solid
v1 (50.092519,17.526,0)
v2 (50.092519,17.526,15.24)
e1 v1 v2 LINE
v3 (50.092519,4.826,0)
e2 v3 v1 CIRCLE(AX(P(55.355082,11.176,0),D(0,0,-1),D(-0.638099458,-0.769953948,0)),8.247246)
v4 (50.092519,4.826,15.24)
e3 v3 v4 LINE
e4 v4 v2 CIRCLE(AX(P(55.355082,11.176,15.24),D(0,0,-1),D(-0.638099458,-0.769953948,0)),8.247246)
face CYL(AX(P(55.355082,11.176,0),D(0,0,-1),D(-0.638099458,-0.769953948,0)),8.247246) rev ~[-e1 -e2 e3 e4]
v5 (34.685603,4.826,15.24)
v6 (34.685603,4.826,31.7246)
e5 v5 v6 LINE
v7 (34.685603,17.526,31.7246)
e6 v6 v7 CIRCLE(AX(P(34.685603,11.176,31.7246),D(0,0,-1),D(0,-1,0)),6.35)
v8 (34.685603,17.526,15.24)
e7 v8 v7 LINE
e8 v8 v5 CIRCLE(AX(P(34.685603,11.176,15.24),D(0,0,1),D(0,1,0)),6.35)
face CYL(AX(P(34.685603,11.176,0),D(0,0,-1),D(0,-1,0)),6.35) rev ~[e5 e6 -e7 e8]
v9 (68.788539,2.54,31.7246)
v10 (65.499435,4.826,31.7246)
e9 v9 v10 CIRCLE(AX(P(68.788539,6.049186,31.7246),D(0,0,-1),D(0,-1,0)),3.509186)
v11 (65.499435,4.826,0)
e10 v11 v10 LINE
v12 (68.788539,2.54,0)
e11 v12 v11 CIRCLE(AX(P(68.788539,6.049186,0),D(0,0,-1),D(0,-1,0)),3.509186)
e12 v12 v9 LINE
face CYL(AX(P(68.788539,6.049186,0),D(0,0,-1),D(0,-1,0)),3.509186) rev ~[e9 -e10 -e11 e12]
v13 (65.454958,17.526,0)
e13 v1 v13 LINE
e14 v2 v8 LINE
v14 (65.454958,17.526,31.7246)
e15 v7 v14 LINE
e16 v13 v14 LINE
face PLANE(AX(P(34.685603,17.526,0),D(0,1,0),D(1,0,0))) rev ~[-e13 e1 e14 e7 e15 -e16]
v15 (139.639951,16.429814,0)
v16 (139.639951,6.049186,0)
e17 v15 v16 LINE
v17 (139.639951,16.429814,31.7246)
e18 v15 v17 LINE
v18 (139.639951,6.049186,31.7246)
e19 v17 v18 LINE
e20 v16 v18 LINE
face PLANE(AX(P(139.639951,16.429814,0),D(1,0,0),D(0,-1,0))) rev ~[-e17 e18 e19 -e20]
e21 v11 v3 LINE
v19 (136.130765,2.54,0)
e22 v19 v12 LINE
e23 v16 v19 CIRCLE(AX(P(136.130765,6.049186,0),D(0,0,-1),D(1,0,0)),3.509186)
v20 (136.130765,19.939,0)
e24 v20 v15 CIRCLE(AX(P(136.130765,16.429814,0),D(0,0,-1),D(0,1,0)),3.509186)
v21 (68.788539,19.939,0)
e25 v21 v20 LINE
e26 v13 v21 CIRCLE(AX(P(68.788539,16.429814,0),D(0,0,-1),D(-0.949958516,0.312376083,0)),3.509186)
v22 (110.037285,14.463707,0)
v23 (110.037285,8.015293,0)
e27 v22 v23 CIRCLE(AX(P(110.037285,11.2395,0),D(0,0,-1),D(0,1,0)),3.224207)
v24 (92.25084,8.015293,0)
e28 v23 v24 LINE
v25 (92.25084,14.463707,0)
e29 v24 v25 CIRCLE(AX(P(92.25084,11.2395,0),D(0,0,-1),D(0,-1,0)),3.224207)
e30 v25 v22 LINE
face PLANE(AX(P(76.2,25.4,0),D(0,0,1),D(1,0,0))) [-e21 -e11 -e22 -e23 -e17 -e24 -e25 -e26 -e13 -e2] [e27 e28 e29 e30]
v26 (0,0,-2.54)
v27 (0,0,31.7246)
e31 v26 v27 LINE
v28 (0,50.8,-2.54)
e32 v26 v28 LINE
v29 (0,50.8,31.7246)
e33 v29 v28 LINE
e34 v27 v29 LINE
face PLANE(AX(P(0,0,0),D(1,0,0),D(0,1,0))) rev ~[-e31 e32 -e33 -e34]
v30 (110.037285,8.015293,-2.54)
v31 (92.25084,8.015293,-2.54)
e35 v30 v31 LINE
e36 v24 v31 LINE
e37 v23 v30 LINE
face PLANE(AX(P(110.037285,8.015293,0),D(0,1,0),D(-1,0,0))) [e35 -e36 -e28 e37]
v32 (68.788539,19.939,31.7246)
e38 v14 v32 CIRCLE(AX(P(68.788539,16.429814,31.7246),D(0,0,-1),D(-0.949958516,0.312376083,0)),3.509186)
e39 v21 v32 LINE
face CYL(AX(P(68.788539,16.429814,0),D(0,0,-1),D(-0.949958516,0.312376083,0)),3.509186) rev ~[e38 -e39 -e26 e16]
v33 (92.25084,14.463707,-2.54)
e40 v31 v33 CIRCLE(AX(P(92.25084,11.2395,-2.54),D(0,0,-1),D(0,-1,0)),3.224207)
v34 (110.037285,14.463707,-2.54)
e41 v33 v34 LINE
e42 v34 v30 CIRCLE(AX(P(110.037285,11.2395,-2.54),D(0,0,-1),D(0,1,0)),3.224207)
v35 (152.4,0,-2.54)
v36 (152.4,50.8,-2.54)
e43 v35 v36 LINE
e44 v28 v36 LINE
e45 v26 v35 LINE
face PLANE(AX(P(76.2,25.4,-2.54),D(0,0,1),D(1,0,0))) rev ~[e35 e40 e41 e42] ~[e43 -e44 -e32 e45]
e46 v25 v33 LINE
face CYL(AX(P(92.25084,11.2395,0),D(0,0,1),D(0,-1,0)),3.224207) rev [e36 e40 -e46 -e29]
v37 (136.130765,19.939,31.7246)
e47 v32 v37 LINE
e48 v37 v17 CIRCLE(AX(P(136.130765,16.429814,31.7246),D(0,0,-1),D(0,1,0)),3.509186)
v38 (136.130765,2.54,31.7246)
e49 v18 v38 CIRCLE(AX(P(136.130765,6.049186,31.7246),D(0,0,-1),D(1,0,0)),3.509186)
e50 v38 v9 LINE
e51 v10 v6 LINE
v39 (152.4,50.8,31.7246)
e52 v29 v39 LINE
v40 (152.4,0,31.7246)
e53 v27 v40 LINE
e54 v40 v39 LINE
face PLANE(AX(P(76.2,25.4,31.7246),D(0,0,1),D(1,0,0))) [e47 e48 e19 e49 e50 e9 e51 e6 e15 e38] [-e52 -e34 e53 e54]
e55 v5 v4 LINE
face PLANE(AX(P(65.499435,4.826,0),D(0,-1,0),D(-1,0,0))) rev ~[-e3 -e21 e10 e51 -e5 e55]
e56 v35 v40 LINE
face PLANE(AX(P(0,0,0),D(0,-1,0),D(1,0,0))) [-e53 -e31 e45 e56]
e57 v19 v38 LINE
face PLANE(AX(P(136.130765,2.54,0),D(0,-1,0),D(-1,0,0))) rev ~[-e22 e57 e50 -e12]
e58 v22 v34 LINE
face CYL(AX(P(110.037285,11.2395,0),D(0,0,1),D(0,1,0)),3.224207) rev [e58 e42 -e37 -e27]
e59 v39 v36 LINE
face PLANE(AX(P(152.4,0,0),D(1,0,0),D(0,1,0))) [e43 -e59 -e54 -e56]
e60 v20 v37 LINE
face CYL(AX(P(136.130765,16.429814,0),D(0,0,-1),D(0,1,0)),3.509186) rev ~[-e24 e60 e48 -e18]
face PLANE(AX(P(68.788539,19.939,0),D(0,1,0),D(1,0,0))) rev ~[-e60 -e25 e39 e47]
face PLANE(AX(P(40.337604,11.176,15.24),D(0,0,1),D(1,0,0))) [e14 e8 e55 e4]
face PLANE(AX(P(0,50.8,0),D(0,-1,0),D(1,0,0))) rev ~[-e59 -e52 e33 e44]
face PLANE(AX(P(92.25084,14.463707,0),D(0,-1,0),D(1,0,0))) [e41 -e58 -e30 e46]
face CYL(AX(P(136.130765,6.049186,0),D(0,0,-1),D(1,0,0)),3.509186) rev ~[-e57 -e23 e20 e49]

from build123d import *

# Parameters (mm, degrees)
F0_W     = 152.4
F0_H     = 50.8
F1_DEPTH = 31.7246
F2_DEPTH = 2.54
F3_DEPTH = 15.24


# Not quite as in the source:
# - a feature names something its author has since deleted; it is built from what else it names


with BuildPart() as f1:
    # F0 (on Top) → F1 (new body)
    with BuildSketch(Plane.XY):
        with Locations((76.2, 25.4)):
            Rectangle(F0_W, F0_H)
        with BuildLine():
            Line((139.6399507581, 16.4298143223), (139.6399507581, 6.0491856777))
            ThreePointArc((139.6399507581, 6.0491856777), (138.6121340696, 3.5678166885), (136.1307650805, 2.54))
            Line((136.1307650805, 2.54), (68.7885385865, 2.54))
            ThreePointArc((68.7885385865, 2.54), (66.7857906668, 3.167626223), (65.4994352256, 4.826))
            Line((65.4994352256, 4.826), (50.0925188645, 4.826))
            Line((50.0925188645, 4.826), (34.6856025033, 4.826))
            ThreePointArc((34.6856025033, 4.826), (28.3356025033, 11.176), (34.6856025033, 17.526))
            Line((34.6856025033, 17.526), (50.0925188645, 17.526))
            Line((50.0925188645, 17.526), (65.4549577669, 17.526))
            ThreePointArc((65.4549577669, 17.526), (66.7309106998, 19.2724454275), (68.7885385865, 19.939))
            Line((68.7885385865, 19.939), (136.1307650805, 19.939))
            ThreePointArc((136.1307650805, 19.939), (138.6121340696, 18.9111833115), (139.6399507581, 16.4298143223))
        make_face(mode=Mode.SUBTRACT)
    extrude(amount=F1_DEPTH)

    # F0 (on Top) → F2 (join)
    with BuildSketch(Plane.XY):
        with Locations((76.2, 25.4)):
            Rectangle(F0_W, F0_H)
        with BuildLine():
            Line((139.6399507581, 16.4298143223), (139.6399507581, 6.0491856777))
            ThreePointArc((139.6399507581, 6.0491856777), (138.6121340696, 3.5678166885), (136.1307650805, 2.54))
            Line((136.1307650805, 2.54), (68.7885385865, 2.54))
            ThreePointArc((68.7885385865, 2.54), (66.7857906668, 3.167626223), (65.4994352256, 4.826))
            Line((65.4994352256, 4.826), (50.0925188645, 4.826))
            Line((50.0925188645, 4.826), (34.6856025033, 4.826))
            ThreePointArc((34.6856025033, 4.826), (28.3356025033, 11.176), (34.6856025033, 17.526))
            Line((34.6856025033, 17.526), (50.0925188645, 17.526))
            Line((50.0925188645, 17.526), (65.4549577669, 17.526))
            ThreePointArc((65.4549577669, 17.526), (66.7309106998, 19.2724454275), (68.7885385865, 19.939))
            Line((68.7885385865, 19.939), (136.1307650805, 19.939))
            ThreePointArc((136.1307650805, 19.939), (138.6121340696, 18.9111833115), (139.6399507581, 16.4298143223))
        make_face(mode=Mode.SUBTRACT)
        with BuildLine():
            ThreePointArc((136.1307650805, 2.54), (138.6121340696, 3.5678166885), (139.6399507581, 6.0491856777))
            Line((139.6399507581, 6.0491856777), (139.6399507581, 16.4298143223))
            ThreePointArc((139.6399507581, 16.4298143223), (138.6121340696, 18.9111833115), (136.1307650805, 19.939))
            Line((136.1307650805, 19.939), (68.7885385865, 19.939))
            ThreePointArc((68.7885385865, 19.939), (66.7309106998, 19.2724454275), (65.4549577669, 17.526))
            Line((65.4549577669, 17.526), (50.0925188645, 17.526))
            ThreePointArc((50.0925188645, 17.526), (47.107835886, 11.176), (50.0925188645, 4.826))
            Line((50.0925188645, 4.826), (65.4994352256, 4.826))
            ThreePointArc((65.4994352256, 4.826), (66.7857906668, 3.167626223), (68.7885385865, 2.54))
            Line((68.7885385865, 2.54), (136.1307650805, 2.54))
        make_face()
        with BuildLine():
            ThreePointArc((92.2508400636, 8.0152933773), (89.0266334409, 11.2395), (92.2508400636, 14.4637066227))
            Line((92.2508400636, 14.4637066227), (110.0372854958, 14.4637066227))
            ThreePointArc((110.0372854958, 14.4637066227), (113.2614921185, 11.2395), (110.0372854958, 8.0152933773))
            Line((110.0372854958, 8.0152933773), (92.2508400636, 8.0152933773))
        make_face(mode=Mode.SUBTRACT)
        with BuildLine():
            Line((34.6856025033, 4.826), (50.0925188645, 4.826))
            ThreePointArc((50.0925188645, 4.826), (47.107835886, 11.176), (50.0925188645, 17.526))
            Line((50.0925188645, 17.526), (34.6856025033, 17.526))
            ThreePointArc((34.6856025033, 17.526), (28.3356025033, 11.176), (34.6856025033, 4.826))
        make_face()
    extrude(amount=-F2_DEPTH)

    # F0 (on Top) → F3 (join)
    with BuildSketch(Plane.XY):
        with BuildLine():
            Line((34.6856025033, 4.826), (50.0925188645, 4.826))
            ThreePointArc((50.0925188645, 4.826), (47.107835886, 11.176), (50.0925188645, 17.526))
            Line((50.0925188645, 17.526), (34.6856025033, 17.526))
            ThreePointArc((34.6856025033, 17.526), (28.3356025033, 11.176), (34.6856025033, 4.826))
        make_face()
    extrude(amount=F3_DEPTH)


solid = f1.part
